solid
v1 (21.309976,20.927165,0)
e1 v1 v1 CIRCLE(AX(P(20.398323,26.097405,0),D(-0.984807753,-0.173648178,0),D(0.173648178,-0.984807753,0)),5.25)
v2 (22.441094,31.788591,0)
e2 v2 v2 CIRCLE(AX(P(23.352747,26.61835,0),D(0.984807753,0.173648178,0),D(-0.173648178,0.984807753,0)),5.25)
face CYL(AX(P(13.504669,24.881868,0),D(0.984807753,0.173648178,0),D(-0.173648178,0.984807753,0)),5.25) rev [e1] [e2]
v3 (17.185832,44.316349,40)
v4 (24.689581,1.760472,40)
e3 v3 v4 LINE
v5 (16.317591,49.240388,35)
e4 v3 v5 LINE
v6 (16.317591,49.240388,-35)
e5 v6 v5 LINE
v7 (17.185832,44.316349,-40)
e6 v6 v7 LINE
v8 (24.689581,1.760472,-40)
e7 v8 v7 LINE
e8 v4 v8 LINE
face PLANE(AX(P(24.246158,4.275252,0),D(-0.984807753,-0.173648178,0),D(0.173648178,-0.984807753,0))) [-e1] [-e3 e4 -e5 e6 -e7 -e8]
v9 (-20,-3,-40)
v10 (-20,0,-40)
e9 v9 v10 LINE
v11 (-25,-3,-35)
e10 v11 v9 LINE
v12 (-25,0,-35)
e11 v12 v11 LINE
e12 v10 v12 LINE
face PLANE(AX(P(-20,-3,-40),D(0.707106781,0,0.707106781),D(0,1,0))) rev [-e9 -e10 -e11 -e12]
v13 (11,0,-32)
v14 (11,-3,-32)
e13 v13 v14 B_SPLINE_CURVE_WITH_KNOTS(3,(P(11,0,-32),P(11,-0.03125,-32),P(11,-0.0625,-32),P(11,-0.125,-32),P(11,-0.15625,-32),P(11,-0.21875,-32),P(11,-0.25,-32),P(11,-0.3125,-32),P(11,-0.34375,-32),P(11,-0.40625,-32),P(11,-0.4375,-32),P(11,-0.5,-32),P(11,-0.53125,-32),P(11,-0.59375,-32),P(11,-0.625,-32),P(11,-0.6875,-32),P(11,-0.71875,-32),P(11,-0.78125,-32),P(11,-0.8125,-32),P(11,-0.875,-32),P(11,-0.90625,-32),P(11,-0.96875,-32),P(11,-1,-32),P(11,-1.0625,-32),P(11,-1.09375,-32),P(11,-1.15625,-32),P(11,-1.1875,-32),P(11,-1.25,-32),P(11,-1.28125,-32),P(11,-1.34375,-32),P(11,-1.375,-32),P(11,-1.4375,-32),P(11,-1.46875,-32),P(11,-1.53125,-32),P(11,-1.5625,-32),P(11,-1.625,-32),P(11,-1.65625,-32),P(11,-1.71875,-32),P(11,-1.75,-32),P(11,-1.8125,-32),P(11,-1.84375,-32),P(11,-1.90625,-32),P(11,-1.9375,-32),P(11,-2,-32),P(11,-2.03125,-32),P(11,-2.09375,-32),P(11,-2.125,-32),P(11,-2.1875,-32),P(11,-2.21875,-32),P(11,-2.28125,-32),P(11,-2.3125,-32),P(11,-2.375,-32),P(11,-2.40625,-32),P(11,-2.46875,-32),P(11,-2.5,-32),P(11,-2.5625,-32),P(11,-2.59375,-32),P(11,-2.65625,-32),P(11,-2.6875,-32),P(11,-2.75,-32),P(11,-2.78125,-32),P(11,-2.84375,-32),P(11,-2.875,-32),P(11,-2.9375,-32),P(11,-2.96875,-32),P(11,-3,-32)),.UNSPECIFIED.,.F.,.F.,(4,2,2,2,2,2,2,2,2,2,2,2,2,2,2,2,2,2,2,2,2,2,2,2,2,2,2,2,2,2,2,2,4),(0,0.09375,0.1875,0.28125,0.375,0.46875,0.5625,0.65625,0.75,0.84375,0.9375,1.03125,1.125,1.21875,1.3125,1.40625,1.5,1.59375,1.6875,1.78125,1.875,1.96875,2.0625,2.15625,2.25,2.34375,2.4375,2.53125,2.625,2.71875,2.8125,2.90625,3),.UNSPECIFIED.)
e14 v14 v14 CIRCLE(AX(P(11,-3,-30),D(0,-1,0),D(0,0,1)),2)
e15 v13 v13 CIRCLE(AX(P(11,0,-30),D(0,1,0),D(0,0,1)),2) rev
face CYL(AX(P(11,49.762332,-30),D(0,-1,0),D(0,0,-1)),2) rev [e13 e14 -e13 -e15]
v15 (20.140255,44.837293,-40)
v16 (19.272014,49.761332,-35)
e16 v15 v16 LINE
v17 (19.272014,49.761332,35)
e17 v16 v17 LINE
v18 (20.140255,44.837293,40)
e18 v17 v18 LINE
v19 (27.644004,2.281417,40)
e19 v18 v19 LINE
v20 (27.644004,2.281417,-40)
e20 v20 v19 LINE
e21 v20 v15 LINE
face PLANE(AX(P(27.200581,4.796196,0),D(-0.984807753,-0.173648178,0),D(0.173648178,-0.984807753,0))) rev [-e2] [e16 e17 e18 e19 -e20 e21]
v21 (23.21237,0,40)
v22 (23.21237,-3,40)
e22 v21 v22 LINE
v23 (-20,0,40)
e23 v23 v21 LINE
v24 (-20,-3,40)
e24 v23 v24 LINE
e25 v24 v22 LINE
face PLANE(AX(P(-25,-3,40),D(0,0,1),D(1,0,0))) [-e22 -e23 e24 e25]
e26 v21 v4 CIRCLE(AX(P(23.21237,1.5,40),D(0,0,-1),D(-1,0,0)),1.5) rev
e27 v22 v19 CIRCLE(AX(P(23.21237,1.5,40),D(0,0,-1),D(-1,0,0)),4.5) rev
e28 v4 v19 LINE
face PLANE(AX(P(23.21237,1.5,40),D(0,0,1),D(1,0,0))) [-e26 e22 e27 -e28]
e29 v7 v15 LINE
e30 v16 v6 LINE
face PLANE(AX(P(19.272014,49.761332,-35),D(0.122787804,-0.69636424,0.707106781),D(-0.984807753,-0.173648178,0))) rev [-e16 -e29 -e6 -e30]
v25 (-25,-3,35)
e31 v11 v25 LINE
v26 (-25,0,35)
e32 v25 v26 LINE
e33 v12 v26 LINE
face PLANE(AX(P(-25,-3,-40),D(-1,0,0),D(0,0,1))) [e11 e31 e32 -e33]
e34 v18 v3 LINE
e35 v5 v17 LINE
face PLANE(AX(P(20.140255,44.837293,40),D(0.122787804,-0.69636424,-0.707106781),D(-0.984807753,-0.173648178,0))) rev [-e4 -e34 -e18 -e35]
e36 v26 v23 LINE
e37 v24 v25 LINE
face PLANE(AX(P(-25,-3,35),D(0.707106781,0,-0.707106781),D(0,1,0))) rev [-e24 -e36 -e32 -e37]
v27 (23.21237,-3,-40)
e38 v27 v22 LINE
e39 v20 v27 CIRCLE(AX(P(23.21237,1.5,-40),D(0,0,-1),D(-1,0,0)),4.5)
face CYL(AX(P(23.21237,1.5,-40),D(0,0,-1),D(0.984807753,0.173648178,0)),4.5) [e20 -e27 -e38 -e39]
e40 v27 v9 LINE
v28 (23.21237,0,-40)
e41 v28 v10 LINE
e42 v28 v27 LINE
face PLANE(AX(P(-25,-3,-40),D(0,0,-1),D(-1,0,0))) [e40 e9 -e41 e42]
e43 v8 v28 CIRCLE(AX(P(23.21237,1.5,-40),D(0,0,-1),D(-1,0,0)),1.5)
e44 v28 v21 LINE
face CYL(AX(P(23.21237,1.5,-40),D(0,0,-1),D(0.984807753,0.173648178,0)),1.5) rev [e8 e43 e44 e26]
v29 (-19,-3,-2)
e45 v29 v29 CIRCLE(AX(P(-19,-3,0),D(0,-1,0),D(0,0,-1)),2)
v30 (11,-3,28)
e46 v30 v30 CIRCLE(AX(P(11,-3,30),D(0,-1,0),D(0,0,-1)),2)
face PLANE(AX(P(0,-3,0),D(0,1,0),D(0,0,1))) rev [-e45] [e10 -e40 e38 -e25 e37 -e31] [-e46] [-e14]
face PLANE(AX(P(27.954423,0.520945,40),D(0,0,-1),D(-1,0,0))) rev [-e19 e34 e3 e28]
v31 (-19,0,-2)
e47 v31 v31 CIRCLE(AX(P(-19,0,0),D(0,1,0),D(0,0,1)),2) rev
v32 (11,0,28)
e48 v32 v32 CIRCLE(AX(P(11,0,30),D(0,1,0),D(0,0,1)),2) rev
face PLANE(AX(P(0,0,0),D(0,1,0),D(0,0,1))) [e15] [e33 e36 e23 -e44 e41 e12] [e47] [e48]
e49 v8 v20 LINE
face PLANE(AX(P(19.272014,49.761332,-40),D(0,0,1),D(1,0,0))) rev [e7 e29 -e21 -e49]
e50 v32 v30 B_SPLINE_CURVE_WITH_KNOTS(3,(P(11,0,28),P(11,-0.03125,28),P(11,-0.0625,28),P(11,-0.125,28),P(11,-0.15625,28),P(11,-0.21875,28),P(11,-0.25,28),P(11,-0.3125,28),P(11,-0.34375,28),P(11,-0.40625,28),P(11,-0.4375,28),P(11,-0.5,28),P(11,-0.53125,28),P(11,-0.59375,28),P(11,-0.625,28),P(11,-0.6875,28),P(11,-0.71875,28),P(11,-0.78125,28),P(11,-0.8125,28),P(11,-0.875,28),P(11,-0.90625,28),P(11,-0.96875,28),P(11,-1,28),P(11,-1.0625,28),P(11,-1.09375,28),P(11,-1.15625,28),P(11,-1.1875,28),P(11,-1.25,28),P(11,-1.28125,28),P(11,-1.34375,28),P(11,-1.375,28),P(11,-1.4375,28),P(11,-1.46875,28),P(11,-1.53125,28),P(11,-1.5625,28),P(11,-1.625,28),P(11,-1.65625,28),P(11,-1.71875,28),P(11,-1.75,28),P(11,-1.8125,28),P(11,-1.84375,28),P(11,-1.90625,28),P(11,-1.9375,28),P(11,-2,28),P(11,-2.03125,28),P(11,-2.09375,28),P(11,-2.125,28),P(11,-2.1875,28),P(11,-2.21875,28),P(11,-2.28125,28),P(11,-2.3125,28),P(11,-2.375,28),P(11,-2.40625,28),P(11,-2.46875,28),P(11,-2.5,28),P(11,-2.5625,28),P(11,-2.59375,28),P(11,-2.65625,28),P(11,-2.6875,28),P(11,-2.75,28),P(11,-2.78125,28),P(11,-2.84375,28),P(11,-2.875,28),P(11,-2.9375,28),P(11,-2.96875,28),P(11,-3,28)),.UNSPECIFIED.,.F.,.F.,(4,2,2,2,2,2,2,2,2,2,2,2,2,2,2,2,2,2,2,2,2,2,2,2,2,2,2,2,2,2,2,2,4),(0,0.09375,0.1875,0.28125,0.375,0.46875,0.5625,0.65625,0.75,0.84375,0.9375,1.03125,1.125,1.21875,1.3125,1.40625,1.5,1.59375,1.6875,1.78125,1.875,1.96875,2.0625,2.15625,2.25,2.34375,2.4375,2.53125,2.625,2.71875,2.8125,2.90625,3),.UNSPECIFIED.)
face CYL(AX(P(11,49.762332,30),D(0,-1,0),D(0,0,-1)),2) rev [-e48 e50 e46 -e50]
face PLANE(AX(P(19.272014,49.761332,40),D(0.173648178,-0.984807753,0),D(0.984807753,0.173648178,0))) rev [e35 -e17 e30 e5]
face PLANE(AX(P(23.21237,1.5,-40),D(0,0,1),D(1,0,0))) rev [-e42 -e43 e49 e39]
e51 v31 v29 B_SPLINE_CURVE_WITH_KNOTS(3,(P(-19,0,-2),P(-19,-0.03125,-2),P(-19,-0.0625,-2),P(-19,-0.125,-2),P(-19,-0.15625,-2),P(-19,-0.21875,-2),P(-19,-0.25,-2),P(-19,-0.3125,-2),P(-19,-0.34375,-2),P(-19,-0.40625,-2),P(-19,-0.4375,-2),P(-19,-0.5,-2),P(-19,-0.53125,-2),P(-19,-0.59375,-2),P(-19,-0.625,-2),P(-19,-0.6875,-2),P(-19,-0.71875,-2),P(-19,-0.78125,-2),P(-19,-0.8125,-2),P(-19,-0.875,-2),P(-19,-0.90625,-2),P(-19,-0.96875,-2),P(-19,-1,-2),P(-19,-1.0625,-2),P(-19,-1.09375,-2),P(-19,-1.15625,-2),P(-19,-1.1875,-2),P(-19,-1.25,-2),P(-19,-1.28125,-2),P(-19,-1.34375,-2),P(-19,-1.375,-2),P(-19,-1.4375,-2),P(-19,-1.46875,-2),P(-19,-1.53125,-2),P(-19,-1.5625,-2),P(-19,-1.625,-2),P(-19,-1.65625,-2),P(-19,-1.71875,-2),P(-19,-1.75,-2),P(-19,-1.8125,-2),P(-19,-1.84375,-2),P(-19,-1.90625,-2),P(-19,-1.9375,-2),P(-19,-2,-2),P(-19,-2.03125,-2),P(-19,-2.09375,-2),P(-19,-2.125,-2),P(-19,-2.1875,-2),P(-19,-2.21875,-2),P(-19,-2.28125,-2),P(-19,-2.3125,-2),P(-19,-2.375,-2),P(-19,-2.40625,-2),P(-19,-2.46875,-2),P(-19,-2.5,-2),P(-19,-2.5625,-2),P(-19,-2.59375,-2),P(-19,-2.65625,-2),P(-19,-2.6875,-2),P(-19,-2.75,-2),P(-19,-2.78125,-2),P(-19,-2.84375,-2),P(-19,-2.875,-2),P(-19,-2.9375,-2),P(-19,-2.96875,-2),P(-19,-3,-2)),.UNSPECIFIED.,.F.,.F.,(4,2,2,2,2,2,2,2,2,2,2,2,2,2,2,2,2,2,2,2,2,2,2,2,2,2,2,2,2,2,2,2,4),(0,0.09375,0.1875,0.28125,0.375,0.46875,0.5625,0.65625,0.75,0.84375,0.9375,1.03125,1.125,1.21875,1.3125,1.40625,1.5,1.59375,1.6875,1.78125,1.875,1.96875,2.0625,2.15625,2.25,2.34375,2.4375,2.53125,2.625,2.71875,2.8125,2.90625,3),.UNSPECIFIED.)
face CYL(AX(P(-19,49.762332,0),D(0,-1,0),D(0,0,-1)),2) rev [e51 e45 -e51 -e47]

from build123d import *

# Parameters (mm, degrees)
SKETCH1_W                    = 50
SKETCH1_H                    = 80
BASE_FLANGE1_DEPTH           = 3
EDGE_FLANGE1_STRIP_CUT_DEPTH = 80
EDGE_FLANGE1_DEPTH           = 80
CHAMFER1_SIZE                = 5
SKETCH7_R                    = 5.25
CUT_EXTRUDE1_DEPTH           = 10
CUT_EXTRUDE2_REACH           = 73.776
SKETCH8_R                    = 2


# Sheet-metal steps are written as plain solids
with BuildPart() as part:
    # Sketch1 → Base-Flange1 (new body)
    with BuildSketch(Plane(origin=(0, 0, 0), x_dir=(1, 0, 0), z_dir=(0, 1, 0))):
        Rectangle(SKETCH1_W, SKETCH1_H)
    extrude(amount=-BASE_FLANGE1_DEPTH)

    # Edge-Flange1 strip (across the edge) → Edge-Flange1 strip cut (cut)
    with BuildSketch(Plane(origin=(25, 0, 40), x_dir=(-0.9848077530122087, -0.17364817766692717, 0), z_dir=(0, 0, -1))):
        Polygon((-15.323305866, -5.748192093), (2.2814168, -2.6440045), (1.760472267, 0.310418759), (-15.844250399, -2.793768834), align=None)
    extrude(amount=EDGE_FLANGE1_STRIP_CUT_DEPTH, mode=Mode.SUBTRACT)

    # Edge-Flange1 section (across the edge) → Edge-Flange1 (add)
    with BuildSketch(Plane(origin=(25, 0, 40), x_dir=(-0.9848077530122087, -0.17364817766692717, 0), z_dir=(0, 0, -1))):
        with BuildLine():
            Line((-3, 1.787630389), (-3, 50))
            Line((-3, 50), (0, 50))
            Line((0, 50), (0, 1.787630389))
            ThreePointArc((0, 1.787630389), (0.535818585, 0.638563724), (1.760472267, 0.310418759))
            Line((1.760472267, 0.310418759), (2.2814168, -2.6440045))
            ThreePointArc((2.2814168, -2.6440045), (-1.392544244, -1.659569605), (-3, 1.787630389))
        make_face()
    extrude(amount=EDGE_FLANGE1_DEPTH)

    # Chamfer1
    chamfer1_edges = [part.edges().sort_by_distance(p)[0] for p in [
        (17.794802746, 49.500859917, 40),
        (17.794802746, 49.500859917, -40),
        (-25, -1.5, 40),
        (-25, -1.5, -40),
    ]]
    chamfer(chamfer1_edges, length=CHAMFER1_SIZE)

    # Sketch7 → Cut-Extrude1 (cut)
    with BuildSketch(Plane(origin=(27.200581019, 4.796196325, 0), x_dir=(0, 0, -1), z_dir=(0.9848077530122087, 0.1736481776669272, 0))):
        with Locations(Location((0, 22.158795558, 0), (0, 0, 90))):
            Circle(SKETCH7_R)
    extrude(amount=-CUT_EXTRUDE1_DEPTH, mode=Mode.SUBTRACT)

    # Sketch8 → Cut-Extrude2 (cut, up to next)
    with BuildSketch(Plane.XZ.offset(3), mode=Mode.PRIVATE) as cut_extrude2_sk1:
        with Locations(Location((-19, 0, 0), (0, 0, 270))):
            Circle(SKETCH8_R)
    cut_extrude2_tool1 = extrude(cut_extrude2_sk1.sketch, amount=-CUT_EXTRUDE2_REACH, mode=Mode.PRIVATE) & part.part
    # Sketch8 → Cut-Extrude2 (cut, up to next)
    with BuildSketch(Plane.XZ.offset(3), mode=Mode.PRIVATE) as cut_extrude2_sk2:
        with Locations(Location((11, 30, 0), (0, 0, 270))):
            Circle(SKETCH8_R)
    cut_extrude2_tool2 = extrude(cut_extrude2_sk2.sketch, amount=-CUT_EXTRUDE2_REACH, mode=Mode.PRIVATE) & part.part
    # Sketch8 → Cut-Extrude2 (cut, up to next)
    with BuildSketch(Plane.XZ.offset(3), mode=Mode.PRIVATE) as cut_extrude2_sk3:
        with Locations(Location((11, -30, 0), (0, 0, 270))):
            Circle(SKETCH8_R)
    cut_extrude2_tool3 = extrude(cut_extrude2_sk3.sketch, amount=-CUT_EXTRUDE2_REACH, mode=Mode.PRIVATE) & part.part
    add(cut_extrude2_tool1.solids().sort_by_distance((-19, -3, 0))[0], mode=Mode.SUBTRACT)
    add(cut_extrude2_tool2.solids().sort_by_distance((11, -3, 30))[0], mode=Mode.SUBTRACT)
    add(cut_extrude2_tool3.solids().sort_by_distance((11, -3, -30))[0], mode=Mode.SUBTRACT)


solid = part.part
